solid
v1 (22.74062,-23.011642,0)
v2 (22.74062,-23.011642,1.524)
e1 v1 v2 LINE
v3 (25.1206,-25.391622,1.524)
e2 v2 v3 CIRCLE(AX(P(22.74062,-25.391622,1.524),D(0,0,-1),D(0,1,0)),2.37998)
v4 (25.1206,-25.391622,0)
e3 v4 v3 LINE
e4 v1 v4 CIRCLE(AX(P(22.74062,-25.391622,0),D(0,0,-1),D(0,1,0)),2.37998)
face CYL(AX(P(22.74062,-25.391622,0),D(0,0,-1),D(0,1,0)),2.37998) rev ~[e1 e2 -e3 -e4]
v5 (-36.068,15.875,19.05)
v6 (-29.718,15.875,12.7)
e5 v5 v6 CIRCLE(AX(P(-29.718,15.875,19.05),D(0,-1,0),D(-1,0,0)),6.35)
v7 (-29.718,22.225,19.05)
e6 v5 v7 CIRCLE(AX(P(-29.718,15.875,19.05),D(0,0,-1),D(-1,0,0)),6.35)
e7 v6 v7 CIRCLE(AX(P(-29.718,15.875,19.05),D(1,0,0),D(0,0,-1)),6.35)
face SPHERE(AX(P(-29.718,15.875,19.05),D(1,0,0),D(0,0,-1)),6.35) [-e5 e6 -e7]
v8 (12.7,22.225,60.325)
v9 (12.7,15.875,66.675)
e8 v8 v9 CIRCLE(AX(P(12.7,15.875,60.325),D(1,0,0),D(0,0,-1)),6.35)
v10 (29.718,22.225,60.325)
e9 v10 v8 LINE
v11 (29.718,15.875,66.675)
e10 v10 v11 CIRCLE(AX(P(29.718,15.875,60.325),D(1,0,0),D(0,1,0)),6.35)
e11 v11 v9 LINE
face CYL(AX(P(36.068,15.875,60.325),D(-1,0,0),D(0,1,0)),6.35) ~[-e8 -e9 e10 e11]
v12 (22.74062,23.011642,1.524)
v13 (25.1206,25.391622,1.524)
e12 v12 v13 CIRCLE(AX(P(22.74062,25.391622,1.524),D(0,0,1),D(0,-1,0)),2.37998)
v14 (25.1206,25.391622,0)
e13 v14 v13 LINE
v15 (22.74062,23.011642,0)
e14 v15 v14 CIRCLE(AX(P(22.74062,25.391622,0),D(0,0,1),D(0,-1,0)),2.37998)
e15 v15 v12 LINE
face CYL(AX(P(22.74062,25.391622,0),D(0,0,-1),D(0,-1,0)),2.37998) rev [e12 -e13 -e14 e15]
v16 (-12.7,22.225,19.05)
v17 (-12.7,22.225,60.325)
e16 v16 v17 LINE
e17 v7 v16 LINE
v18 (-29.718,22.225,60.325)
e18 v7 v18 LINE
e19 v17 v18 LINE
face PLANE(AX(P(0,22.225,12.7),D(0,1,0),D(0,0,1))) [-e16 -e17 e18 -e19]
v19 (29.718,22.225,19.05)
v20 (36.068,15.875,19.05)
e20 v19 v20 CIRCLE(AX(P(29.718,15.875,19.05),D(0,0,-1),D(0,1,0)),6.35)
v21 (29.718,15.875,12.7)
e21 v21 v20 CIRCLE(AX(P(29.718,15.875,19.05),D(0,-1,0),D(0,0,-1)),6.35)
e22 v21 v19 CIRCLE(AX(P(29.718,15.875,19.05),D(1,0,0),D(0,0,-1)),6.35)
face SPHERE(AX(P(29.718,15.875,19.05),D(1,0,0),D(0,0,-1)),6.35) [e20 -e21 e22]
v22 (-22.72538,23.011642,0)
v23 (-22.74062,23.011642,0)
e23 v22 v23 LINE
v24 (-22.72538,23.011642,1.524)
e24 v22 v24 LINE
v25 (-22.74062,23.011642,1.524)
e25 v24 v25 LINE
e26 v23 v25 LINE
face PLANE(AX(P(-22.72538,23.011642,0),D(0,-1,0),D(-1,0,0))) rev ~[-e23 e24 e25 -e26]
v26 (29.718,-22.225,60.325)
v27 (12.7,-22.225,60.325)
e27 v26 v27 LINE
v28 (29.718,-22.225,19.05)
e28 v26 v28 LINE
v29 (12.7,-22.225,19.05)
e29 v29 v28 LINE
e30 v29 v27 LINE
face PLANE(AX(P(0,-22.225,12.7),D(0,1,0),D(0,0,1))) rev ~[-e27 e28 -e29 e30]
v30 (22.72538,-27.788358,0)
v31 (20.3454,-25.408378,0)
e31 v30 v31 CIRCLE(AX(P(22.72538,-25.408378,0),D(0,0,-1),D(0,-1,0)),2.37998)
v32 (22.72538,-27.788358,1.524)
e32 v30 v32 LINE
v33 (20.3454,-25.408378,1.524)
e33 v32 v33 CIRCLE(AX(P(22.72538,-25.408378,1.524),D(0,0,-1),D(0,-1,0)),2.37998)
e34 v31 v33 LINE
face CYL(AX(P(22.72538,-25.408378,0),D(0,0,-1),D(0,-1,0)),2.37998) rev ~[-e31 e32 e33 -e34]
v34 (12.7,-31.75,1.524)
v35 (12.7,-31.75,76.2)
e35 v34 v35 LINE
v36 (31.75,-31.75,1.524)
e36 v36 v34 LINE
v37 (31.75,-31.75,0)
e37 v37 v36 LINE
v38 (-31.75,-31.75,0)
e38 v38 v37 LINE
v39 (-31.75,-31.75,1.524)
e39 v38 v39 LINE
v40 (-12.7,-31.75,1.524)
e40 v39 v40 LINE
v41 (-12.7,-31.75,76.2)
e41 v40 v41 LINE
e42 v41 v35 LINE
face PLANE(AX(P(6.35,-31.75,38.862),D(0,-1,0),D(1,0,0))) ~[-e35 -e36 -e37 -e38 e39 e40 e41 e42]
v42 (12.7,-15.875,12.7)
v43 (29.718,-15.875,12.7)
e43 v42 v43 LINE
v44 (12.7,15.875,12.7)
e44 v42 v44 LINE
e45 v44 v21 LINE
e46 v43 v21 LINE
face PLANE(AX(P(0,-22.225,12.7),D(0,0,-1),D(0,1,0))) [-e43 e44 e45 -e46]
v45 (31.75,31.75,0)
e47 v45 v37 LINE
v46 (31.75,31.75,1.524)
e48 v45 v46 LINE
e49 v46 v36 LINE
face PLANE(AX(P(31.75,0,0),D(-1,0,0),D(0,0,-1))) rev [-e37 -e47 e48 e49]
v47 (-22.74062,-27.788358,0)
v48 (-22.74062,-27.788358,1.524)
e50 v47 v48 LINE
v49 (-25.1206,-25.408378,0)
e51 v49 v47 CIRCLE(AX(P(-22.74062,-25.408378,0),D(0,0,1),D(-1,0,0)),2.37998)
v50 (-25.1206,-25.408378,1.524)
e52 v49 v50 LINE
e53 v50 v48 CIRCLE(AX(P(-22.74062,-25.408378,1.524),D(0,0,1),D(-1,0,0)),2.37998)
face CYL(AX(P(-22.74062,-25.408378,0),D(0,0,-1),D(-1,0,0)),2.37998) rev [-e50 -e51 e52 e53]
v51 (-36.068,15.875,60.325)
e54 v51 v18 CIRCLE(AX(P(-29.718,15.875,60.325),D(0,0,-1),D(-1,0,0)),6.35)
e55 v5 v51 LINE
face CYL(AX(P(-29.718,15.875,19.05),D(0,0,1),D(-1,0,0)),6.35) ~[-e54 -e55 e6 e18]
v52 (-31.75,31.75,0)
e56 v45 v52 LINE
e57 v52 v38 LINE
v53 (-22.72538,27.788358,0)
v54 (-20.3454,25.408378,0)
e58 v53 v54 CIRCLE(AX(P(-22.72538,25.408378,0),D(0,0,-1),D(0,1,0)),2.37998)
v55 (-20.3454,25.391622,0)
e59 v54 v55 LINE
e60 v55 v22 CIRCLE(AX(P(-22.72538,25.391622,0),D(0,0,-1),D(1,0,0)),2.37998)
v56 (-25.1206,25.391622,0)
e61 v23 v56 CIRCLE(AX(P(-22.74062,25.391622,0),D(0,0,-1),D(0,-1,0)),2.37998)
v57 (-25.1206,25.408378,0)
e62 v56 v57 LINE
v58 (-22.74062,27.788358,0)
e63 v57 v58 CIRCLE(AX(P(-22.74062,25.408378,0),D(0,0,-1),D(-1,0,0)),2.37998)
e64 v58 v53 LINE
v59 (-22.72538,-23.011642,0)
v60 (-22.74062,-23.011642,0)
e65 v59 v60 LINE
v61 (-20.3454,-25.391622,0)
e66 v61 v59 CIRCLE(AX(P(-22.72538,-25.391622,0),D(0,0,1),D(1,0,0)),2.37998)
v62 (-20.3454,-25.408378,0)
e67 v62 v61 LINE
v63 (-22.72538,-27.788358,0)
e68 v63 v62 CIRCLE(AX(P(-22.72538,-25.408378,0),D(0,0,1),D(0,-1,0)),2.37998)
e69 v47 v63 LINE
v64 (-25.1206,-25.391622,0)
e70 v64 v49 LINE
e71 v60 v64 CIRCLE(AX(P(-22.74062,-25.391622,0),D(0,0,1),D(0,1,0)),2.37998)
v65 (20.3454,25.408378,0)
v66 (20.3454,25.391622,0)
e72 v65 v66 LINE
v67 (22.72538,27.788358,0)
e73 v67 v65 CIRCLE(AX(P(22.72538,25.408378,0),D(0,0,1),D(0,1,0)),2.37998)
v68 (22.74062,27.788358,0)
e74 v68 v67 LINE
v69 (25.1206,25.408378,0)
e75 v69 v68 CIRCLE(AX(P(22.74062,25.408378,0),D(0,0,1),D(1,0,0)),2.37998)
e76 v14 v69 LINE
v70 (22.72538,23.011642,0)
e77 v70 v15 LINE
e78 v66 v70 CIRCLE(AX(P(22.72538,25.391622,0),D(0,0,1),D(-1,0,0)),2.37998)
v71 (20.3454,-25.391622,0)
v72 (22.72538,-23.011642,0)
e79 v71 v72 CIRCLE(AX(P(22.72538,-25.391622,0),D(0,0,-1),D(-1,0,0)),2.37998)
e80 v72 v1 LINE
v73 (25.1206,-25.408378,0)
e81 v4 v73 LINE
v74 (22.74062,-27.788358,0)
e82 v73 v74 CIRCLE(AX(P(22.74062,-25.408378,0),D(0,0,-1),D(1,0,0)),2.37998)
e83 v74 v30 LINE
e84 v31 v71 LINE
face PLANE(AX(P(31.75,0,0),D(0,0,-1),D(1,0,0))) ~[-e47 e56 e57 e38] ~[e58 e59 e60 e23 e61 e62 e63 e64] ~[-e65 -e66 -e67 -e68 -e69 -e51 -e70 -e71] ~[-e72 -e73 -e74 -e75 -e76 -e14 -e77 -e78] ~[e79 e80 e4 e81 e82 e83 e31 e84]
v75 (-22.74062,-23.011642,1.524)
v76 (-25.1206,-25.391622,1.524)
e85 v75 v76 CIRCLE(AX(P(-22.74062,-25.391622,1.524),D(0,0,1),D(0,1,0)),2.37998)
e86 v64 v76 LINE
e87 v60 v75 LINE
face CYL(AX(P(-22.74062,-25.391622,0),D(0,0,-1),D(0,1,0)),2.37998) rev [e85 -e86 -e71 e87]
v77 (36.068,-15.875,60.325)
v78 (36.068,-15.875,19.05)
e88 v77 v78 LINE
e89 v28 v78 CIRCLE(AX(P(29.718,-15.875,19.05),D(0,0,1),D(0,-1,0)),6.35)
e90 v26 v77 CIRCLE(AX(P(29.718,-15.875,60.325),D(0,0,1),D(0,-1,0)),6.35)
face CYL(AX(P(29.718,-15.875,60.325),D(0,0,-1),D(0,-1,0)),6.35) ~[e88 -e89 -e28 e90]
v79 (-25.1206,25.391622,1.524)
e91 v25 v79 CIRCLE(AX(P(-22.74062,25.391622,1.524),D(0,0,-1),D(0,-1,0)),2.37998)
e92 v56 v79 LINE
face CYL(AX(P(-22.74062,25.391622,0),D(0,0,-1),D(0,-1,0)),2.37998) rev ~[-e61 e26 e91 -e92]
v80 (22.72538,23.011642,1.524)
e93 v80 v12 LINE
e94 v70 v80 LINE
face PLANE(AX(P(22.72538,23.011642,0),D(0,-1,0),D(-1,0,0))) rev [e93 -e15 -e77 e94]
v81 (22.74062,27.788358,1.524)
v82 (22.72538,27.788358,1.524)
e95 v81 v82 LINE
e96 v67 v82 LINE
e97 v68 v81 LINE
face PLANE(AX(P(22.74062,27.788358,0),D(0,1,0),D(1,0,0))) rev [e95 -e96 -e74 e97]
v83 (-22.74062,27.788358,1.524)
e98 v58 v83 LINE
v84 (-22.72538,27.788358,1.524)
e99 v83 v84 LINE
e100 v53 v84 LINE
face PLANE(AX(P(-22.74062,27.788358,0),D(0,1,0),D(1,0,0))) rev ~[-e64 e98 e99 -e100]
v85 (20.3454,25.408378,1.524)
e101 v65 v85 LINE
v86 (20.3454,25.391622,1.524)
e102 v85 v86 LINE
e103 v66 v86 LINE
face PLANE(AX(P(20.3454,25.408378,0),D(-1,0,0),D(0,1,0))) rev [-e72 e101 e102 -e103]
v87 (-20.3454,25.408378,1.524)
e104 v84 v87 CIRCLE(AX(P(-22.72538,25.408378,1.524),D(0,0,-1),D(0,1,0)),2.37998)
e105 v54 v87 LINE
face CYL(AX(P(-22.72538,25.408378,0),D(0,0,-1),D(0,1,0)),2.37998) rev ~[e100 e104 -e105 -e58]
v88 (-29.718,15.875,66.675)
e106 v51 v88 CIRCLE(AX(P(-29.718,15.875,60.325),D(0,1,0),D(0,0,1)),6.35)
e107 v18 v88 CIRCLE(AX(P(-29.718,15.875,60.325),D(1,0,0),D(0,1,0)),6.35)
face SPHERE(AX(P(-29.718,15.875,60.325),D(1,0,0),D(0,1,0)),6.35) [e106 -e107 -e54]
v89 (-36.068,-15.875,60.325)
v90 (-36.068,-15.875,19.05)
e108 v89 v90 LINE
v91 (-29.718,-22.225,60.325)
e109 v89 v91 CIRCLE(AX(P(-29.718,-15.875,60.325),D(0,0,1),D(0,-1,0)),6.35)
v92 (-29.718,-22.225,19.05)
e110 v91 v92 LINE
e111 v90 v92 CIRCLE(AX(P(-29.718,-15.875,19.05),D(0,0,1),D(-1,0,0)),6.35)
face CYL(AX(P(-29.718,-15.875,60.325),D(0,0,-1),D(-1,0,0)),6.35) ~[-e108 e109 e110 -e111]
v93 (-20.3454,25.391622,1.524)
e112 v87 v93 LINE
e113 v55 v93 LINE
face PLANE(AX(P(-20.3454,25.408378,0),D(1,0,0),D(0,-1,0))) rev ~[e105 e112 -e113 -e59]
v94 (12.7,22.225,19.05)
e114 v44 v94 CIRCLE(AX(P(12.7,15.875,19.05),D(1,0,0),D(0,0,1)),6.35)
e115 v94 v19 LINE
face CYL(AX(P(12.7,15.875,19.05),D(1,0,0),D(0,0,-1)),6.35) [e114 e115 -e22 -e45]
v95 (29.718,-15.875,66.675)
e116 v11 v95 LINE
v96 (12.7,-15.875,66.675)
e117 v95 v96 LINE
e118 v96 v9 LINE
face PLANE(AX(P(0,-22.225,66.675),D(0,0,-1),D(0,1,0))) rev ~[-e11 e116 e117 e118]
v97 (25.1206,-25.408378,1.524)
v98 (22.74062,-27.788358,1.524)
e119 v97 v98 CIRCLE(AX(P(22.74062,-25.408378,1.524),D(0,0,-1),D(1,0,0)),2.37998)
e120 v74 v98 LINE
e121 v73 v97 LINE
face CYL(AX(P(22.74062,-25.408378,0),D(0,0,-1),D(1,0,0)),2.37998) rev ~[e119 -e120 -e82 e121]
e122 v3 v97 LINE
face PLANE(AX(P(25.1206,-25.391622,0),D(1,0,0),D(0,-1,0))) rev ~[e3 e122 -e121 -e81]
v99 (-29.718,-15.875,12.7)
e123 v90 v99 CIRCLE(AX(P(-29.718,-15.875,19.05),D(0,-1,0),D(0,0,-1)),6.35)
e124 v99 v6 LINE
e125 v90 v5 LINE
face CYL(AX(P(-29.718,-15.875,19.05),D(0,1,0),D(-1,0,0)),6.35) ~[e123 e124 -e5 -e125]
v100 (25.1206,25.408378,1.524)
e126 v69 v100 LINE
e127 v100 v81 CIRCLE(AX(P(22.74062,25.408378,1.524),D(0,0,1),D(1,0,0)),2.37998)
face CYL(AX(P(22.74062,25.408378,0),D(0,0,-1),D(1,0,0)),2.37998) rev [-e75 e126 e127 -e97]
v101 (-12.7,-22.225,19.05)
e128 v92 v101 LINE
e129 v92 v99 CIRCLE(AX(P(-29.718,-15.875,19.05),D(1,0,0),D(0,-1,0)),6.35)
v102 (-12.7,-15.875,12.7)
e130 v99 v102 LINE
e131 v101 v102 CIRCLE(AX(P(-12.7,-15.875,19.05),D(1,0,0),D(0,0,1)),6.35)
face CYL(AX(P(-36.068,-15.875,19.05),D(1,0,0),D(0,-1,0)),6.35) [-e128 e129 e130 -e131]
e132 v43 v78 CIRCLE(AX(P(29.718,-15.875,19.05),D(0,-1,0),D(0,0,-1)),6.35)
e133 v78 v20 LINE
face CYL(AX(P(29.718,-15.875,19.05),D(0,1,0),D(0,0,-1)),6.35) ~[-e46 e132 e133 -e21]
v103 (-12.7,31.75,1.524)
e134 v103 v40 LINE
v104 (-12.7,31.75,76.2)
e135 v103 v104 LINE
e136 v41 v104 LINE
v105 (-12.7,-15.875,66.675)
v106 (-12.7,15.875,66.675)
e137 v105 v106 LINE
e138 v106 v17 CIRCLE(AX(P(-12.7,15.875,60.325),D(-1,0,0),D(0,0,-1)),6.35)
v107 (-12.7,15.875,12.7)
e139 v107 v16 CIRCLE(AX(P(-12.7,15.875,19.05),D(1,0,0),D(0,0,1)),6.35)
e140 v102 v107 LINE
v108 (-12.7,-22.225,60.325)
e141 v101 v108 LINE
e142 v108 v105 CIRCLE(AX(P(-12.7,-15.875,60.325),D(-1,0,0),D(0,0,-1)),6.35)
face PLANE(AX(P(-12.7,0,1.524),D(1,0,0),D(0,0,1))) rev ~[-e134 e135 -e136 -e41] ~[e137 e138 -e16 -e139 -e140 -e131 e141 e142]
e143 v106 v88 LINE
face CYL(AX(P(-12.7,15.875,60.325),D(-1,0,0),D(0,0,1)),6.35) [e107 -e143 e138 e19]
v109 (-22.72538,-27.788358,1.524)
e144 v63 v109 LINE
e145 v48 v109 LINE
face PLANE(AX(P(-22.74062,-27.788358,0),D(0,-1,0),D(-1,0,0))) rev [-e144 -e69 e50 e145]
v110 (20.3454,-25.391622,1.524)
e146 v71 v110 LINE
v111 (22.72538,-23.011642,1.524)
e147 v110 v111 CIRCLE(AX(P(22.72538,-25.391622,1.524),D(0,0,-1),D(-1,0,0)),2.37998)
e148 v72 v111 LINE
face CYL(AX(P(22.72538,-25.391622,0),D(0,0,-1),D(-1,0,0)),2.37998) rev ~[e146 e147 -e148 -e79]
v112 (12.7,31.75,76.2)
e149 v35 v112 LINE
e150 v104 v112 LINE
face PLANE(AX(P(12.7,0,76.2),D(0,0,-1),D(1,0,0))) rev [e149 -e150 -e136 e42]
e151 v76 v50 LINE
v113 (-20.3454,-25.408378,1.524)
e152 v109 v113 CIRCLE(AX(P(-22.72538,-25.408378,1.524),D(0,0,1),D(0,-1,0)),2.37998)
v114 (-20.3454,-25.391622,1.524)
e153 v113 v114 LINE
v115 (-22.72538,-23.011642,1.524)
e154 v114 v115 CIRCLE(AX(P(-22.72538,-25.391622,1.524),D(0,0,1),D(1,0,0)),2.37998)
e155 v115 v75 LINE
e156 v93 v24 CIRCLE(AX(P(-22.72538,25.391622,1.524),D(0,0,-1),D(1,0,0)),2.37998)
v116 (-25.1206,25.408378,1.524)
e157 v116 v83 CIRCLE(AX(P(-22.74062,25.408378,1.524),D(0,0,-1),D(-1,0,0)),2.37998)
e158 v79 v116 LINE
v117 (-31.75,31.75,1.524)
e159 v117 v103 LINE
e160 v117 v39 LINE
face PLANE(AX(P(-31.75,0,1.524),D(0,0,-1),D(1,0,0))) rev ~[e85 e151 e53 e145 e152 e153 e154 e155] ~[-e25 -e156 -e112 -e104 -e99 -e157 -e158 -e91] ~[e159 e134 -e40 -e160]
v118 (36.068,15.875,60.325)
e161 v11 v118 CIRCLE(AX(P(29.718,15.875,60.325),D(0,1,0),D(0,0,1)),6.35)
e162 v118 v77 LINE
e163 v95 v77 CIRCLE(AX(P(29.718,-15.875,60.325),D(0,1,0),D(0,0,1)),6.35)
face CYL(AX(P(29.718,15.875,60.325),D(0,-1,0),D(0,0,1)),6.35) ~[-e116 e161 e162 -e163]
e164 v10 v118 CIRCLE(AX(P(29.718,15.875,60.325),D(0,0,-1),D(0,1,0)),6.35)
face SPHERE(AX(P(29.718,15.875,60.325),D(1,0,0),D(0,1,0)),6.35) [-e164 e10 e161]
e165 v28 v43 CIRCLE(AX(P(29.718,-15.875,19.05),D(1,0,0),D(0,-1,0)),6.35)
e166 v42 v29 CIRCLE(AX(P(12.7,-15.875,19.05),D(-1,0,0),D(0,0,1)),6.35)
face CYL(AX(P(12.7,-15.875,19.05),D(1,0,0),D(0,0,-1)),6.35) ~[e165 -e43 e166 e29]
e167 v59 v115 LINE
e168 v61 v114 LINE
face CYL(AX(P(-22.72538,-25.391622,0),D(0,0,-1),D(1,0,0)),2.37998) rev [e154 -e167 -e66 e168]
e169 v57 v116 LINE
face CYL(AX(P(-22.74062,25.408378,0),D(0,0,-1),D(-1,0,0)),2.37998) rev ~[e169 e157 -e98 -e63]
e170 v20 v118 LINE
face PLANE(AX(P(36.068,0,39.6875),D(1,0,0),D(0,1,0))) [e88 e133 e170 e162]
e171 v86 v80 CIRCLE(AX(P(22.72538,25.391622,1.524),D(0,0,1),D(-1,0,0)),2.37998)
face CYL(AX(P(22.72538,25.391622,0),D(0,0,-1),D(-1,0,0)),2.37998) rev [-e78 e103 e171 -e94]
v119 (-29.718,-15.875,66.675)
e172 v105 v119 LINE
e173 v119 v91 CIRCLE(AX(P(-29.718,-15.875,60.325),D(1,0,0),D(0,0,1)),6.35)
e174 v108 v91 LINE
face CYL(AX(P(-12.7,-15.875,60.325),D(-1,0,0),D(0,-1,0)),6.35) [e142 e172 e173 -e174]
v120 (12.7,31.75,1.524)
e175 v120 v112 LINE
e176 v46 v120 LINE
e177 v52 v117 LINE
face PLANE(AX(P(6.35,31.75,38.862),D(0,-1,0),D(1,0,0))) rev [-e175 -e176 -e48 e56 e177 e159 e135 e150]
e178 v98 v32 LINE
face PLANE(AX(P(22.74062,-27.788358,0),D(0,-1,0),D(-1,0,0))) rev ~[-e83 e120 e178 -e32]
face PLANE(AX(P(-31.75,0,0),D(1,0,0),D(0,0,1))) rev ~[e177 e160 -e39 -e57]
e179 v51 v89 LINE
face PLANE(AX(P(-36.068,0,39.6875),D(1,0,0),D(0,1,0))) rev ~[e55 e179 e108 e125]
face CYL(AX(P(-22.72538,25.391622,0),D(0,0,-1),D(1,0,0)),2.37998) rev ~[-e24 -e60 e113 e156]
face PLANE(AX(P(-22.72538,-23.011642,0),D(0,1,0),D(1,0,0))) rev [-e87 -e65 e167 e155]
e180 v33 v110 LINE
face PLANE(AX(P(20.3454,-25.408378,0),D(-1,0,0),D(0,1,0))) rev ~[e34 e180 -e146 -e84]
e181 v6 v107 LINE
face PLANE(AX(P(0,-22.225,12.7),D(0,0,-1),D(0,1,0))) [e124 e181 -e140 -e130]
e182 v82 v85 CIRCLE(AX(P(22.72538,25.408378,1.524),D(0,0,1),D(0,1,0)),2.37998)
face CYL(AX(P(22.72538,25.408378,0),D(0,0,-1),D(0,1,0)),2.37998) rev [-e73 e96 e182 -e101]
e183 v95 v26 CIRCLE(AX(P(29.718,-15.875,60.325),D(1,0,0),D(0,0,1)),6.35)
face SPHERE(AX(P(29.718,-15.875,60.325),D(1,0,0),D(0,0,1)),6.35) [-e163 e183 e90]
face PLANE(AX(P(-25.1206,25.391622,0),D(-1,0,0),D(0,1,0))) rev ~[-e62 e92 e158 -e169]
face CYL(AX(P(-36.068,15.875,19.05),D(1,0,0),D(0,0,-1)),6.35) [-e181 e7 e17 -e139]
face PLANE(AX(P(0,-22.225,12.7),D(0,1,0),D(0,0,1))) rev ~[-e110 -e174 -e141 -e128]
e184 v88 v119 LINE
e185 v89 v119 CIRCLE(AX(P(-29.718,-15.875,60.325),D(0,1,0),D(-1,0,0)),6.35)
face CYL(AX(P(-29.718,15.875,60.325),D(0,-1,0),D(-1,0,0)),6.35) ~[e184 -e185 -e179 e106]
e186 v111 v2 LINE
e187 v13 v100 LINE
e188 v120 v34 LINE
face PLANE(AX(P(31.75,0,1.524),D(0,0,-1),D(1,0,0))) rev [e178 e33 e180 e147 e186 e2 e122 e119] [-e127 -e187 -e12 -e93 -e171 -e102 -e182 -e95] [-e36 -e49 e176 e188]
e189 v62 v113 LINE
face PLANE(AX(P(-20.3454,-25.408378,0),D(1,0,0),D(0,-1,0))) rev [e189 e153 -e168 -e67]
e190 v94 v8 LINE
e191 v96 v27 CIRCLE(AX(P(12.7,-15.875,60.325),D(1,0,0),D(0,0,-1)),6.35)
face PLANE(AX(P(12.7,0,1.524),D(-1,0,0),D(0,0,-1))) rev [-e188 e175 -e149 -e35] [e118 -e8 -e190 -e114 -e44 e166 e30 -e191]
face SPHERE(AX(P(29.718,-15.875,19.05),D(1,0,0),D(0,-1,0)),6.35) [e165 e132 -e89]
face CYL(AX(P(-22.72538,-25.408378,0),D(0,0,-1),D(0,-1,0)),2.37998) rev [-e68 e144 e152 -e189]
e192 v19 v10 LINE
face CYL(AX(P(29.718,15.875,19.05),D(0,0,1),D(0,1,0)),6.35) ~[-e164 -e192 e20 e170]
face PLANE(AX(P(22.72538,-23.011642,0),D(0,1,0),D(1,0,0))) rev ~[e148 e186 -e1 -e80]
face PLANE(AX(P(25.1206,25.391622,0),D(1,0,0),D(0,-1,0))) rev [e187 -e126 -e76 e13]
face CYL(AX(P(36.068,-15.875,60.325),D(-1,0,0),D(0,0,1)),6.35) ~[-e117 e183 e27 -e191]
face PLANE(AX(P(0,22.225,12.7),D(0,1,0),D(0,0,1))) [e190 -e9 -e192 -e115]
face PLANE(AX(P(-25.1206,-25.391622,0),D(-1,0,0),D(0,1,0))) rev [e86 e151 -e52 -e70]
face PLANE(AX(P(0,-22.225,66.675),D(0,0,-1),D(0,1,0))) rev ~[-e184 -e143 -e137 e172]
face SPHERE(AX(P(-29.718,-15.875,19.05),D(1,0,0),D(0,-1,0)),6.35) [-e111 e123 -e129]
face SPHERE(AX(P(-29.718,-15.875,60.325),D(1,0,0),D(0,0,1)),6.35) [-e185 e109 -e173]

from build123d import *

# Parameters (mm, degrees)
F0_W             = 12.7
F0_H             = 74.676
F0_W_2           = 19.05
F0_H_2           = 1.524
F1_DEPTH         = 31.75
F3_W             = 44.45
F3_H             = 53.975
F4_DEPTH         = 36.068
F6_DEPTH         = 1.524
F6_COPIES2_COUNT = 2
F6_COPIES2_PITCH = 68.174755
F7_R             = 6.35
F8_R             = 6.35


# Not quite as in the source:
# - a pattern or mirror of a feature is missing from the dataset's text; its kind, count and spacing are read off the source's solid


with BuildPart() as f1:
    # F0 (on Front) → F1 (new body, symmetric)
    with BuildSketch(Plane.XZ):
        with Locations((-6.35, 38.862)):
            Rectangle(F0_W, F0_H)
        with Locations((-22.225, 0.762)):
            Rectangle(F0_W_2, F0_H_2)
        with Locations((-6.35, 0.762)):
            Rectangle(F0_W, F0_H_2)
    extrude(amount=F1_DEPTH, both=True)

    # F2: F1 across plane


with BuildPart() as f1_1:
    add(f1.part)
    add(f1.part.mirror(Plane.YZ))

    # F3 (on Right) → F4 (join, symmetric)
    with BuildSketch(Plane.YZ):
        with Locations((0, 39.6875)):
            Rectangle(F3_W, F3_H)
    extrude(amount=F4_DEPTH, both=True)

    # F5 (on face) → F6 (cut, through all)
    with BuildSketch(Plane(origin=(0, 0, 0), x_dir=(1, 0, 0), z_dir=(0, 0, -1))):
        with BuildLine():
            Line((22.72538, 23.0116418839), (22.74062, 23.0116418839))
            ThreePointArc((22.74062, 23.0116418839), (24.4235199971, 23.7087218868), (25.1206, 25.3916218839))
            Line((25.1206, 25.3916218839), (25.1206, 25.4083781161))
            ThreePointArc((25.1206, 25.4083781161), (24.4235199971, 27.0912781132), (22.74062, 27.7883581161))
            Line((22.74062, 27.7883581161), (22.72538, 27.7883581161))
            ThreePointArc((22.72538, 27.7883581161), (21.0424800029, 27.0912781132), (20.3454, 25.4083781161))
            Line((20.3454, 25.4083781161), (20.3454, 25.3916218839))
            ThreePointArc((20.3454, 25.3916218839), (21.0424800029, 23.7087218868), (22.72538, 23.0116418839))
        make_face()
    f6 = extrude(amount=-F6_DEPTH, mode=Mode.SUBTRACT)

    # F6_copies: F6 across plane
    add(f6.mirror(Plane.ZX), mode=Mode.SUBTRACT)

    # F6_copies1: F6 across plane
    add(f6.mirror(Plane(origin=(0, 0, 0), x_dir=(0, 0, -1), z_dir=(-1, 0, 0))), mode=Mode.SUBTRACT)

    # F6_copies2: F6 ×2
    with Locations(*[Vector(-0.666903758, 0.7451438637, 0) * (i * F6_COPIES2_PITCH) for i in range(1, F6_COPIES2_COUNT)]):
        add(f6, mode=Mode.SUBTRACT)

    # F7
    f7_edges = [f1_1.edges().sort_by_distance(p)[0] for p in [
        (24.384, -22.225, 66.675),
        (24.384, 22.225, 66.675),
        (24.384, 22.225, 12.7),
        (24.384, -22.225, 12.7),
        (-24.384, -22.225, 12.7),
        (-24.384, -22.225, 66.675),
        (-24.384, 22.225, 66.675),
        (-24.384, 22.225, 12.7),
    ]]
    fillet(f7_edges, radius=F7_R)

    # F8
    f8_edges = [f1_1.edges().sort_by_distance(p)[0] for p in [
        (-36.068, 22.225, 39.6875),
        (-36.068, 20.365128, 14.559872),
        (-36.068, 20.365128, 64.815128),
        (-36.068, 0, 12.7),
        (-36.068, 0, 66.675),
        (-36.068, -20.365128, 14.559872),
        (-36.068, -20.365128, 64.815128),
        (-36.068, -22.225, 39.6875),
        (36.068, 22.225, 39.6875),
        (36.068, 20.365128, 14.559872),
        (36.068, 20.365128, 64.815128),
        (36.068, 0, 12.7),
        (36.068, 0, 66.675),
        (36.068, -20.365128, 14.559872),
        (36.068, -20.365128, 64.815128),
        (36.068, -22.225, 39.6875),
    ]]
    fillet(f8_edges, radius=F8_R)


solid = f1_1.part
